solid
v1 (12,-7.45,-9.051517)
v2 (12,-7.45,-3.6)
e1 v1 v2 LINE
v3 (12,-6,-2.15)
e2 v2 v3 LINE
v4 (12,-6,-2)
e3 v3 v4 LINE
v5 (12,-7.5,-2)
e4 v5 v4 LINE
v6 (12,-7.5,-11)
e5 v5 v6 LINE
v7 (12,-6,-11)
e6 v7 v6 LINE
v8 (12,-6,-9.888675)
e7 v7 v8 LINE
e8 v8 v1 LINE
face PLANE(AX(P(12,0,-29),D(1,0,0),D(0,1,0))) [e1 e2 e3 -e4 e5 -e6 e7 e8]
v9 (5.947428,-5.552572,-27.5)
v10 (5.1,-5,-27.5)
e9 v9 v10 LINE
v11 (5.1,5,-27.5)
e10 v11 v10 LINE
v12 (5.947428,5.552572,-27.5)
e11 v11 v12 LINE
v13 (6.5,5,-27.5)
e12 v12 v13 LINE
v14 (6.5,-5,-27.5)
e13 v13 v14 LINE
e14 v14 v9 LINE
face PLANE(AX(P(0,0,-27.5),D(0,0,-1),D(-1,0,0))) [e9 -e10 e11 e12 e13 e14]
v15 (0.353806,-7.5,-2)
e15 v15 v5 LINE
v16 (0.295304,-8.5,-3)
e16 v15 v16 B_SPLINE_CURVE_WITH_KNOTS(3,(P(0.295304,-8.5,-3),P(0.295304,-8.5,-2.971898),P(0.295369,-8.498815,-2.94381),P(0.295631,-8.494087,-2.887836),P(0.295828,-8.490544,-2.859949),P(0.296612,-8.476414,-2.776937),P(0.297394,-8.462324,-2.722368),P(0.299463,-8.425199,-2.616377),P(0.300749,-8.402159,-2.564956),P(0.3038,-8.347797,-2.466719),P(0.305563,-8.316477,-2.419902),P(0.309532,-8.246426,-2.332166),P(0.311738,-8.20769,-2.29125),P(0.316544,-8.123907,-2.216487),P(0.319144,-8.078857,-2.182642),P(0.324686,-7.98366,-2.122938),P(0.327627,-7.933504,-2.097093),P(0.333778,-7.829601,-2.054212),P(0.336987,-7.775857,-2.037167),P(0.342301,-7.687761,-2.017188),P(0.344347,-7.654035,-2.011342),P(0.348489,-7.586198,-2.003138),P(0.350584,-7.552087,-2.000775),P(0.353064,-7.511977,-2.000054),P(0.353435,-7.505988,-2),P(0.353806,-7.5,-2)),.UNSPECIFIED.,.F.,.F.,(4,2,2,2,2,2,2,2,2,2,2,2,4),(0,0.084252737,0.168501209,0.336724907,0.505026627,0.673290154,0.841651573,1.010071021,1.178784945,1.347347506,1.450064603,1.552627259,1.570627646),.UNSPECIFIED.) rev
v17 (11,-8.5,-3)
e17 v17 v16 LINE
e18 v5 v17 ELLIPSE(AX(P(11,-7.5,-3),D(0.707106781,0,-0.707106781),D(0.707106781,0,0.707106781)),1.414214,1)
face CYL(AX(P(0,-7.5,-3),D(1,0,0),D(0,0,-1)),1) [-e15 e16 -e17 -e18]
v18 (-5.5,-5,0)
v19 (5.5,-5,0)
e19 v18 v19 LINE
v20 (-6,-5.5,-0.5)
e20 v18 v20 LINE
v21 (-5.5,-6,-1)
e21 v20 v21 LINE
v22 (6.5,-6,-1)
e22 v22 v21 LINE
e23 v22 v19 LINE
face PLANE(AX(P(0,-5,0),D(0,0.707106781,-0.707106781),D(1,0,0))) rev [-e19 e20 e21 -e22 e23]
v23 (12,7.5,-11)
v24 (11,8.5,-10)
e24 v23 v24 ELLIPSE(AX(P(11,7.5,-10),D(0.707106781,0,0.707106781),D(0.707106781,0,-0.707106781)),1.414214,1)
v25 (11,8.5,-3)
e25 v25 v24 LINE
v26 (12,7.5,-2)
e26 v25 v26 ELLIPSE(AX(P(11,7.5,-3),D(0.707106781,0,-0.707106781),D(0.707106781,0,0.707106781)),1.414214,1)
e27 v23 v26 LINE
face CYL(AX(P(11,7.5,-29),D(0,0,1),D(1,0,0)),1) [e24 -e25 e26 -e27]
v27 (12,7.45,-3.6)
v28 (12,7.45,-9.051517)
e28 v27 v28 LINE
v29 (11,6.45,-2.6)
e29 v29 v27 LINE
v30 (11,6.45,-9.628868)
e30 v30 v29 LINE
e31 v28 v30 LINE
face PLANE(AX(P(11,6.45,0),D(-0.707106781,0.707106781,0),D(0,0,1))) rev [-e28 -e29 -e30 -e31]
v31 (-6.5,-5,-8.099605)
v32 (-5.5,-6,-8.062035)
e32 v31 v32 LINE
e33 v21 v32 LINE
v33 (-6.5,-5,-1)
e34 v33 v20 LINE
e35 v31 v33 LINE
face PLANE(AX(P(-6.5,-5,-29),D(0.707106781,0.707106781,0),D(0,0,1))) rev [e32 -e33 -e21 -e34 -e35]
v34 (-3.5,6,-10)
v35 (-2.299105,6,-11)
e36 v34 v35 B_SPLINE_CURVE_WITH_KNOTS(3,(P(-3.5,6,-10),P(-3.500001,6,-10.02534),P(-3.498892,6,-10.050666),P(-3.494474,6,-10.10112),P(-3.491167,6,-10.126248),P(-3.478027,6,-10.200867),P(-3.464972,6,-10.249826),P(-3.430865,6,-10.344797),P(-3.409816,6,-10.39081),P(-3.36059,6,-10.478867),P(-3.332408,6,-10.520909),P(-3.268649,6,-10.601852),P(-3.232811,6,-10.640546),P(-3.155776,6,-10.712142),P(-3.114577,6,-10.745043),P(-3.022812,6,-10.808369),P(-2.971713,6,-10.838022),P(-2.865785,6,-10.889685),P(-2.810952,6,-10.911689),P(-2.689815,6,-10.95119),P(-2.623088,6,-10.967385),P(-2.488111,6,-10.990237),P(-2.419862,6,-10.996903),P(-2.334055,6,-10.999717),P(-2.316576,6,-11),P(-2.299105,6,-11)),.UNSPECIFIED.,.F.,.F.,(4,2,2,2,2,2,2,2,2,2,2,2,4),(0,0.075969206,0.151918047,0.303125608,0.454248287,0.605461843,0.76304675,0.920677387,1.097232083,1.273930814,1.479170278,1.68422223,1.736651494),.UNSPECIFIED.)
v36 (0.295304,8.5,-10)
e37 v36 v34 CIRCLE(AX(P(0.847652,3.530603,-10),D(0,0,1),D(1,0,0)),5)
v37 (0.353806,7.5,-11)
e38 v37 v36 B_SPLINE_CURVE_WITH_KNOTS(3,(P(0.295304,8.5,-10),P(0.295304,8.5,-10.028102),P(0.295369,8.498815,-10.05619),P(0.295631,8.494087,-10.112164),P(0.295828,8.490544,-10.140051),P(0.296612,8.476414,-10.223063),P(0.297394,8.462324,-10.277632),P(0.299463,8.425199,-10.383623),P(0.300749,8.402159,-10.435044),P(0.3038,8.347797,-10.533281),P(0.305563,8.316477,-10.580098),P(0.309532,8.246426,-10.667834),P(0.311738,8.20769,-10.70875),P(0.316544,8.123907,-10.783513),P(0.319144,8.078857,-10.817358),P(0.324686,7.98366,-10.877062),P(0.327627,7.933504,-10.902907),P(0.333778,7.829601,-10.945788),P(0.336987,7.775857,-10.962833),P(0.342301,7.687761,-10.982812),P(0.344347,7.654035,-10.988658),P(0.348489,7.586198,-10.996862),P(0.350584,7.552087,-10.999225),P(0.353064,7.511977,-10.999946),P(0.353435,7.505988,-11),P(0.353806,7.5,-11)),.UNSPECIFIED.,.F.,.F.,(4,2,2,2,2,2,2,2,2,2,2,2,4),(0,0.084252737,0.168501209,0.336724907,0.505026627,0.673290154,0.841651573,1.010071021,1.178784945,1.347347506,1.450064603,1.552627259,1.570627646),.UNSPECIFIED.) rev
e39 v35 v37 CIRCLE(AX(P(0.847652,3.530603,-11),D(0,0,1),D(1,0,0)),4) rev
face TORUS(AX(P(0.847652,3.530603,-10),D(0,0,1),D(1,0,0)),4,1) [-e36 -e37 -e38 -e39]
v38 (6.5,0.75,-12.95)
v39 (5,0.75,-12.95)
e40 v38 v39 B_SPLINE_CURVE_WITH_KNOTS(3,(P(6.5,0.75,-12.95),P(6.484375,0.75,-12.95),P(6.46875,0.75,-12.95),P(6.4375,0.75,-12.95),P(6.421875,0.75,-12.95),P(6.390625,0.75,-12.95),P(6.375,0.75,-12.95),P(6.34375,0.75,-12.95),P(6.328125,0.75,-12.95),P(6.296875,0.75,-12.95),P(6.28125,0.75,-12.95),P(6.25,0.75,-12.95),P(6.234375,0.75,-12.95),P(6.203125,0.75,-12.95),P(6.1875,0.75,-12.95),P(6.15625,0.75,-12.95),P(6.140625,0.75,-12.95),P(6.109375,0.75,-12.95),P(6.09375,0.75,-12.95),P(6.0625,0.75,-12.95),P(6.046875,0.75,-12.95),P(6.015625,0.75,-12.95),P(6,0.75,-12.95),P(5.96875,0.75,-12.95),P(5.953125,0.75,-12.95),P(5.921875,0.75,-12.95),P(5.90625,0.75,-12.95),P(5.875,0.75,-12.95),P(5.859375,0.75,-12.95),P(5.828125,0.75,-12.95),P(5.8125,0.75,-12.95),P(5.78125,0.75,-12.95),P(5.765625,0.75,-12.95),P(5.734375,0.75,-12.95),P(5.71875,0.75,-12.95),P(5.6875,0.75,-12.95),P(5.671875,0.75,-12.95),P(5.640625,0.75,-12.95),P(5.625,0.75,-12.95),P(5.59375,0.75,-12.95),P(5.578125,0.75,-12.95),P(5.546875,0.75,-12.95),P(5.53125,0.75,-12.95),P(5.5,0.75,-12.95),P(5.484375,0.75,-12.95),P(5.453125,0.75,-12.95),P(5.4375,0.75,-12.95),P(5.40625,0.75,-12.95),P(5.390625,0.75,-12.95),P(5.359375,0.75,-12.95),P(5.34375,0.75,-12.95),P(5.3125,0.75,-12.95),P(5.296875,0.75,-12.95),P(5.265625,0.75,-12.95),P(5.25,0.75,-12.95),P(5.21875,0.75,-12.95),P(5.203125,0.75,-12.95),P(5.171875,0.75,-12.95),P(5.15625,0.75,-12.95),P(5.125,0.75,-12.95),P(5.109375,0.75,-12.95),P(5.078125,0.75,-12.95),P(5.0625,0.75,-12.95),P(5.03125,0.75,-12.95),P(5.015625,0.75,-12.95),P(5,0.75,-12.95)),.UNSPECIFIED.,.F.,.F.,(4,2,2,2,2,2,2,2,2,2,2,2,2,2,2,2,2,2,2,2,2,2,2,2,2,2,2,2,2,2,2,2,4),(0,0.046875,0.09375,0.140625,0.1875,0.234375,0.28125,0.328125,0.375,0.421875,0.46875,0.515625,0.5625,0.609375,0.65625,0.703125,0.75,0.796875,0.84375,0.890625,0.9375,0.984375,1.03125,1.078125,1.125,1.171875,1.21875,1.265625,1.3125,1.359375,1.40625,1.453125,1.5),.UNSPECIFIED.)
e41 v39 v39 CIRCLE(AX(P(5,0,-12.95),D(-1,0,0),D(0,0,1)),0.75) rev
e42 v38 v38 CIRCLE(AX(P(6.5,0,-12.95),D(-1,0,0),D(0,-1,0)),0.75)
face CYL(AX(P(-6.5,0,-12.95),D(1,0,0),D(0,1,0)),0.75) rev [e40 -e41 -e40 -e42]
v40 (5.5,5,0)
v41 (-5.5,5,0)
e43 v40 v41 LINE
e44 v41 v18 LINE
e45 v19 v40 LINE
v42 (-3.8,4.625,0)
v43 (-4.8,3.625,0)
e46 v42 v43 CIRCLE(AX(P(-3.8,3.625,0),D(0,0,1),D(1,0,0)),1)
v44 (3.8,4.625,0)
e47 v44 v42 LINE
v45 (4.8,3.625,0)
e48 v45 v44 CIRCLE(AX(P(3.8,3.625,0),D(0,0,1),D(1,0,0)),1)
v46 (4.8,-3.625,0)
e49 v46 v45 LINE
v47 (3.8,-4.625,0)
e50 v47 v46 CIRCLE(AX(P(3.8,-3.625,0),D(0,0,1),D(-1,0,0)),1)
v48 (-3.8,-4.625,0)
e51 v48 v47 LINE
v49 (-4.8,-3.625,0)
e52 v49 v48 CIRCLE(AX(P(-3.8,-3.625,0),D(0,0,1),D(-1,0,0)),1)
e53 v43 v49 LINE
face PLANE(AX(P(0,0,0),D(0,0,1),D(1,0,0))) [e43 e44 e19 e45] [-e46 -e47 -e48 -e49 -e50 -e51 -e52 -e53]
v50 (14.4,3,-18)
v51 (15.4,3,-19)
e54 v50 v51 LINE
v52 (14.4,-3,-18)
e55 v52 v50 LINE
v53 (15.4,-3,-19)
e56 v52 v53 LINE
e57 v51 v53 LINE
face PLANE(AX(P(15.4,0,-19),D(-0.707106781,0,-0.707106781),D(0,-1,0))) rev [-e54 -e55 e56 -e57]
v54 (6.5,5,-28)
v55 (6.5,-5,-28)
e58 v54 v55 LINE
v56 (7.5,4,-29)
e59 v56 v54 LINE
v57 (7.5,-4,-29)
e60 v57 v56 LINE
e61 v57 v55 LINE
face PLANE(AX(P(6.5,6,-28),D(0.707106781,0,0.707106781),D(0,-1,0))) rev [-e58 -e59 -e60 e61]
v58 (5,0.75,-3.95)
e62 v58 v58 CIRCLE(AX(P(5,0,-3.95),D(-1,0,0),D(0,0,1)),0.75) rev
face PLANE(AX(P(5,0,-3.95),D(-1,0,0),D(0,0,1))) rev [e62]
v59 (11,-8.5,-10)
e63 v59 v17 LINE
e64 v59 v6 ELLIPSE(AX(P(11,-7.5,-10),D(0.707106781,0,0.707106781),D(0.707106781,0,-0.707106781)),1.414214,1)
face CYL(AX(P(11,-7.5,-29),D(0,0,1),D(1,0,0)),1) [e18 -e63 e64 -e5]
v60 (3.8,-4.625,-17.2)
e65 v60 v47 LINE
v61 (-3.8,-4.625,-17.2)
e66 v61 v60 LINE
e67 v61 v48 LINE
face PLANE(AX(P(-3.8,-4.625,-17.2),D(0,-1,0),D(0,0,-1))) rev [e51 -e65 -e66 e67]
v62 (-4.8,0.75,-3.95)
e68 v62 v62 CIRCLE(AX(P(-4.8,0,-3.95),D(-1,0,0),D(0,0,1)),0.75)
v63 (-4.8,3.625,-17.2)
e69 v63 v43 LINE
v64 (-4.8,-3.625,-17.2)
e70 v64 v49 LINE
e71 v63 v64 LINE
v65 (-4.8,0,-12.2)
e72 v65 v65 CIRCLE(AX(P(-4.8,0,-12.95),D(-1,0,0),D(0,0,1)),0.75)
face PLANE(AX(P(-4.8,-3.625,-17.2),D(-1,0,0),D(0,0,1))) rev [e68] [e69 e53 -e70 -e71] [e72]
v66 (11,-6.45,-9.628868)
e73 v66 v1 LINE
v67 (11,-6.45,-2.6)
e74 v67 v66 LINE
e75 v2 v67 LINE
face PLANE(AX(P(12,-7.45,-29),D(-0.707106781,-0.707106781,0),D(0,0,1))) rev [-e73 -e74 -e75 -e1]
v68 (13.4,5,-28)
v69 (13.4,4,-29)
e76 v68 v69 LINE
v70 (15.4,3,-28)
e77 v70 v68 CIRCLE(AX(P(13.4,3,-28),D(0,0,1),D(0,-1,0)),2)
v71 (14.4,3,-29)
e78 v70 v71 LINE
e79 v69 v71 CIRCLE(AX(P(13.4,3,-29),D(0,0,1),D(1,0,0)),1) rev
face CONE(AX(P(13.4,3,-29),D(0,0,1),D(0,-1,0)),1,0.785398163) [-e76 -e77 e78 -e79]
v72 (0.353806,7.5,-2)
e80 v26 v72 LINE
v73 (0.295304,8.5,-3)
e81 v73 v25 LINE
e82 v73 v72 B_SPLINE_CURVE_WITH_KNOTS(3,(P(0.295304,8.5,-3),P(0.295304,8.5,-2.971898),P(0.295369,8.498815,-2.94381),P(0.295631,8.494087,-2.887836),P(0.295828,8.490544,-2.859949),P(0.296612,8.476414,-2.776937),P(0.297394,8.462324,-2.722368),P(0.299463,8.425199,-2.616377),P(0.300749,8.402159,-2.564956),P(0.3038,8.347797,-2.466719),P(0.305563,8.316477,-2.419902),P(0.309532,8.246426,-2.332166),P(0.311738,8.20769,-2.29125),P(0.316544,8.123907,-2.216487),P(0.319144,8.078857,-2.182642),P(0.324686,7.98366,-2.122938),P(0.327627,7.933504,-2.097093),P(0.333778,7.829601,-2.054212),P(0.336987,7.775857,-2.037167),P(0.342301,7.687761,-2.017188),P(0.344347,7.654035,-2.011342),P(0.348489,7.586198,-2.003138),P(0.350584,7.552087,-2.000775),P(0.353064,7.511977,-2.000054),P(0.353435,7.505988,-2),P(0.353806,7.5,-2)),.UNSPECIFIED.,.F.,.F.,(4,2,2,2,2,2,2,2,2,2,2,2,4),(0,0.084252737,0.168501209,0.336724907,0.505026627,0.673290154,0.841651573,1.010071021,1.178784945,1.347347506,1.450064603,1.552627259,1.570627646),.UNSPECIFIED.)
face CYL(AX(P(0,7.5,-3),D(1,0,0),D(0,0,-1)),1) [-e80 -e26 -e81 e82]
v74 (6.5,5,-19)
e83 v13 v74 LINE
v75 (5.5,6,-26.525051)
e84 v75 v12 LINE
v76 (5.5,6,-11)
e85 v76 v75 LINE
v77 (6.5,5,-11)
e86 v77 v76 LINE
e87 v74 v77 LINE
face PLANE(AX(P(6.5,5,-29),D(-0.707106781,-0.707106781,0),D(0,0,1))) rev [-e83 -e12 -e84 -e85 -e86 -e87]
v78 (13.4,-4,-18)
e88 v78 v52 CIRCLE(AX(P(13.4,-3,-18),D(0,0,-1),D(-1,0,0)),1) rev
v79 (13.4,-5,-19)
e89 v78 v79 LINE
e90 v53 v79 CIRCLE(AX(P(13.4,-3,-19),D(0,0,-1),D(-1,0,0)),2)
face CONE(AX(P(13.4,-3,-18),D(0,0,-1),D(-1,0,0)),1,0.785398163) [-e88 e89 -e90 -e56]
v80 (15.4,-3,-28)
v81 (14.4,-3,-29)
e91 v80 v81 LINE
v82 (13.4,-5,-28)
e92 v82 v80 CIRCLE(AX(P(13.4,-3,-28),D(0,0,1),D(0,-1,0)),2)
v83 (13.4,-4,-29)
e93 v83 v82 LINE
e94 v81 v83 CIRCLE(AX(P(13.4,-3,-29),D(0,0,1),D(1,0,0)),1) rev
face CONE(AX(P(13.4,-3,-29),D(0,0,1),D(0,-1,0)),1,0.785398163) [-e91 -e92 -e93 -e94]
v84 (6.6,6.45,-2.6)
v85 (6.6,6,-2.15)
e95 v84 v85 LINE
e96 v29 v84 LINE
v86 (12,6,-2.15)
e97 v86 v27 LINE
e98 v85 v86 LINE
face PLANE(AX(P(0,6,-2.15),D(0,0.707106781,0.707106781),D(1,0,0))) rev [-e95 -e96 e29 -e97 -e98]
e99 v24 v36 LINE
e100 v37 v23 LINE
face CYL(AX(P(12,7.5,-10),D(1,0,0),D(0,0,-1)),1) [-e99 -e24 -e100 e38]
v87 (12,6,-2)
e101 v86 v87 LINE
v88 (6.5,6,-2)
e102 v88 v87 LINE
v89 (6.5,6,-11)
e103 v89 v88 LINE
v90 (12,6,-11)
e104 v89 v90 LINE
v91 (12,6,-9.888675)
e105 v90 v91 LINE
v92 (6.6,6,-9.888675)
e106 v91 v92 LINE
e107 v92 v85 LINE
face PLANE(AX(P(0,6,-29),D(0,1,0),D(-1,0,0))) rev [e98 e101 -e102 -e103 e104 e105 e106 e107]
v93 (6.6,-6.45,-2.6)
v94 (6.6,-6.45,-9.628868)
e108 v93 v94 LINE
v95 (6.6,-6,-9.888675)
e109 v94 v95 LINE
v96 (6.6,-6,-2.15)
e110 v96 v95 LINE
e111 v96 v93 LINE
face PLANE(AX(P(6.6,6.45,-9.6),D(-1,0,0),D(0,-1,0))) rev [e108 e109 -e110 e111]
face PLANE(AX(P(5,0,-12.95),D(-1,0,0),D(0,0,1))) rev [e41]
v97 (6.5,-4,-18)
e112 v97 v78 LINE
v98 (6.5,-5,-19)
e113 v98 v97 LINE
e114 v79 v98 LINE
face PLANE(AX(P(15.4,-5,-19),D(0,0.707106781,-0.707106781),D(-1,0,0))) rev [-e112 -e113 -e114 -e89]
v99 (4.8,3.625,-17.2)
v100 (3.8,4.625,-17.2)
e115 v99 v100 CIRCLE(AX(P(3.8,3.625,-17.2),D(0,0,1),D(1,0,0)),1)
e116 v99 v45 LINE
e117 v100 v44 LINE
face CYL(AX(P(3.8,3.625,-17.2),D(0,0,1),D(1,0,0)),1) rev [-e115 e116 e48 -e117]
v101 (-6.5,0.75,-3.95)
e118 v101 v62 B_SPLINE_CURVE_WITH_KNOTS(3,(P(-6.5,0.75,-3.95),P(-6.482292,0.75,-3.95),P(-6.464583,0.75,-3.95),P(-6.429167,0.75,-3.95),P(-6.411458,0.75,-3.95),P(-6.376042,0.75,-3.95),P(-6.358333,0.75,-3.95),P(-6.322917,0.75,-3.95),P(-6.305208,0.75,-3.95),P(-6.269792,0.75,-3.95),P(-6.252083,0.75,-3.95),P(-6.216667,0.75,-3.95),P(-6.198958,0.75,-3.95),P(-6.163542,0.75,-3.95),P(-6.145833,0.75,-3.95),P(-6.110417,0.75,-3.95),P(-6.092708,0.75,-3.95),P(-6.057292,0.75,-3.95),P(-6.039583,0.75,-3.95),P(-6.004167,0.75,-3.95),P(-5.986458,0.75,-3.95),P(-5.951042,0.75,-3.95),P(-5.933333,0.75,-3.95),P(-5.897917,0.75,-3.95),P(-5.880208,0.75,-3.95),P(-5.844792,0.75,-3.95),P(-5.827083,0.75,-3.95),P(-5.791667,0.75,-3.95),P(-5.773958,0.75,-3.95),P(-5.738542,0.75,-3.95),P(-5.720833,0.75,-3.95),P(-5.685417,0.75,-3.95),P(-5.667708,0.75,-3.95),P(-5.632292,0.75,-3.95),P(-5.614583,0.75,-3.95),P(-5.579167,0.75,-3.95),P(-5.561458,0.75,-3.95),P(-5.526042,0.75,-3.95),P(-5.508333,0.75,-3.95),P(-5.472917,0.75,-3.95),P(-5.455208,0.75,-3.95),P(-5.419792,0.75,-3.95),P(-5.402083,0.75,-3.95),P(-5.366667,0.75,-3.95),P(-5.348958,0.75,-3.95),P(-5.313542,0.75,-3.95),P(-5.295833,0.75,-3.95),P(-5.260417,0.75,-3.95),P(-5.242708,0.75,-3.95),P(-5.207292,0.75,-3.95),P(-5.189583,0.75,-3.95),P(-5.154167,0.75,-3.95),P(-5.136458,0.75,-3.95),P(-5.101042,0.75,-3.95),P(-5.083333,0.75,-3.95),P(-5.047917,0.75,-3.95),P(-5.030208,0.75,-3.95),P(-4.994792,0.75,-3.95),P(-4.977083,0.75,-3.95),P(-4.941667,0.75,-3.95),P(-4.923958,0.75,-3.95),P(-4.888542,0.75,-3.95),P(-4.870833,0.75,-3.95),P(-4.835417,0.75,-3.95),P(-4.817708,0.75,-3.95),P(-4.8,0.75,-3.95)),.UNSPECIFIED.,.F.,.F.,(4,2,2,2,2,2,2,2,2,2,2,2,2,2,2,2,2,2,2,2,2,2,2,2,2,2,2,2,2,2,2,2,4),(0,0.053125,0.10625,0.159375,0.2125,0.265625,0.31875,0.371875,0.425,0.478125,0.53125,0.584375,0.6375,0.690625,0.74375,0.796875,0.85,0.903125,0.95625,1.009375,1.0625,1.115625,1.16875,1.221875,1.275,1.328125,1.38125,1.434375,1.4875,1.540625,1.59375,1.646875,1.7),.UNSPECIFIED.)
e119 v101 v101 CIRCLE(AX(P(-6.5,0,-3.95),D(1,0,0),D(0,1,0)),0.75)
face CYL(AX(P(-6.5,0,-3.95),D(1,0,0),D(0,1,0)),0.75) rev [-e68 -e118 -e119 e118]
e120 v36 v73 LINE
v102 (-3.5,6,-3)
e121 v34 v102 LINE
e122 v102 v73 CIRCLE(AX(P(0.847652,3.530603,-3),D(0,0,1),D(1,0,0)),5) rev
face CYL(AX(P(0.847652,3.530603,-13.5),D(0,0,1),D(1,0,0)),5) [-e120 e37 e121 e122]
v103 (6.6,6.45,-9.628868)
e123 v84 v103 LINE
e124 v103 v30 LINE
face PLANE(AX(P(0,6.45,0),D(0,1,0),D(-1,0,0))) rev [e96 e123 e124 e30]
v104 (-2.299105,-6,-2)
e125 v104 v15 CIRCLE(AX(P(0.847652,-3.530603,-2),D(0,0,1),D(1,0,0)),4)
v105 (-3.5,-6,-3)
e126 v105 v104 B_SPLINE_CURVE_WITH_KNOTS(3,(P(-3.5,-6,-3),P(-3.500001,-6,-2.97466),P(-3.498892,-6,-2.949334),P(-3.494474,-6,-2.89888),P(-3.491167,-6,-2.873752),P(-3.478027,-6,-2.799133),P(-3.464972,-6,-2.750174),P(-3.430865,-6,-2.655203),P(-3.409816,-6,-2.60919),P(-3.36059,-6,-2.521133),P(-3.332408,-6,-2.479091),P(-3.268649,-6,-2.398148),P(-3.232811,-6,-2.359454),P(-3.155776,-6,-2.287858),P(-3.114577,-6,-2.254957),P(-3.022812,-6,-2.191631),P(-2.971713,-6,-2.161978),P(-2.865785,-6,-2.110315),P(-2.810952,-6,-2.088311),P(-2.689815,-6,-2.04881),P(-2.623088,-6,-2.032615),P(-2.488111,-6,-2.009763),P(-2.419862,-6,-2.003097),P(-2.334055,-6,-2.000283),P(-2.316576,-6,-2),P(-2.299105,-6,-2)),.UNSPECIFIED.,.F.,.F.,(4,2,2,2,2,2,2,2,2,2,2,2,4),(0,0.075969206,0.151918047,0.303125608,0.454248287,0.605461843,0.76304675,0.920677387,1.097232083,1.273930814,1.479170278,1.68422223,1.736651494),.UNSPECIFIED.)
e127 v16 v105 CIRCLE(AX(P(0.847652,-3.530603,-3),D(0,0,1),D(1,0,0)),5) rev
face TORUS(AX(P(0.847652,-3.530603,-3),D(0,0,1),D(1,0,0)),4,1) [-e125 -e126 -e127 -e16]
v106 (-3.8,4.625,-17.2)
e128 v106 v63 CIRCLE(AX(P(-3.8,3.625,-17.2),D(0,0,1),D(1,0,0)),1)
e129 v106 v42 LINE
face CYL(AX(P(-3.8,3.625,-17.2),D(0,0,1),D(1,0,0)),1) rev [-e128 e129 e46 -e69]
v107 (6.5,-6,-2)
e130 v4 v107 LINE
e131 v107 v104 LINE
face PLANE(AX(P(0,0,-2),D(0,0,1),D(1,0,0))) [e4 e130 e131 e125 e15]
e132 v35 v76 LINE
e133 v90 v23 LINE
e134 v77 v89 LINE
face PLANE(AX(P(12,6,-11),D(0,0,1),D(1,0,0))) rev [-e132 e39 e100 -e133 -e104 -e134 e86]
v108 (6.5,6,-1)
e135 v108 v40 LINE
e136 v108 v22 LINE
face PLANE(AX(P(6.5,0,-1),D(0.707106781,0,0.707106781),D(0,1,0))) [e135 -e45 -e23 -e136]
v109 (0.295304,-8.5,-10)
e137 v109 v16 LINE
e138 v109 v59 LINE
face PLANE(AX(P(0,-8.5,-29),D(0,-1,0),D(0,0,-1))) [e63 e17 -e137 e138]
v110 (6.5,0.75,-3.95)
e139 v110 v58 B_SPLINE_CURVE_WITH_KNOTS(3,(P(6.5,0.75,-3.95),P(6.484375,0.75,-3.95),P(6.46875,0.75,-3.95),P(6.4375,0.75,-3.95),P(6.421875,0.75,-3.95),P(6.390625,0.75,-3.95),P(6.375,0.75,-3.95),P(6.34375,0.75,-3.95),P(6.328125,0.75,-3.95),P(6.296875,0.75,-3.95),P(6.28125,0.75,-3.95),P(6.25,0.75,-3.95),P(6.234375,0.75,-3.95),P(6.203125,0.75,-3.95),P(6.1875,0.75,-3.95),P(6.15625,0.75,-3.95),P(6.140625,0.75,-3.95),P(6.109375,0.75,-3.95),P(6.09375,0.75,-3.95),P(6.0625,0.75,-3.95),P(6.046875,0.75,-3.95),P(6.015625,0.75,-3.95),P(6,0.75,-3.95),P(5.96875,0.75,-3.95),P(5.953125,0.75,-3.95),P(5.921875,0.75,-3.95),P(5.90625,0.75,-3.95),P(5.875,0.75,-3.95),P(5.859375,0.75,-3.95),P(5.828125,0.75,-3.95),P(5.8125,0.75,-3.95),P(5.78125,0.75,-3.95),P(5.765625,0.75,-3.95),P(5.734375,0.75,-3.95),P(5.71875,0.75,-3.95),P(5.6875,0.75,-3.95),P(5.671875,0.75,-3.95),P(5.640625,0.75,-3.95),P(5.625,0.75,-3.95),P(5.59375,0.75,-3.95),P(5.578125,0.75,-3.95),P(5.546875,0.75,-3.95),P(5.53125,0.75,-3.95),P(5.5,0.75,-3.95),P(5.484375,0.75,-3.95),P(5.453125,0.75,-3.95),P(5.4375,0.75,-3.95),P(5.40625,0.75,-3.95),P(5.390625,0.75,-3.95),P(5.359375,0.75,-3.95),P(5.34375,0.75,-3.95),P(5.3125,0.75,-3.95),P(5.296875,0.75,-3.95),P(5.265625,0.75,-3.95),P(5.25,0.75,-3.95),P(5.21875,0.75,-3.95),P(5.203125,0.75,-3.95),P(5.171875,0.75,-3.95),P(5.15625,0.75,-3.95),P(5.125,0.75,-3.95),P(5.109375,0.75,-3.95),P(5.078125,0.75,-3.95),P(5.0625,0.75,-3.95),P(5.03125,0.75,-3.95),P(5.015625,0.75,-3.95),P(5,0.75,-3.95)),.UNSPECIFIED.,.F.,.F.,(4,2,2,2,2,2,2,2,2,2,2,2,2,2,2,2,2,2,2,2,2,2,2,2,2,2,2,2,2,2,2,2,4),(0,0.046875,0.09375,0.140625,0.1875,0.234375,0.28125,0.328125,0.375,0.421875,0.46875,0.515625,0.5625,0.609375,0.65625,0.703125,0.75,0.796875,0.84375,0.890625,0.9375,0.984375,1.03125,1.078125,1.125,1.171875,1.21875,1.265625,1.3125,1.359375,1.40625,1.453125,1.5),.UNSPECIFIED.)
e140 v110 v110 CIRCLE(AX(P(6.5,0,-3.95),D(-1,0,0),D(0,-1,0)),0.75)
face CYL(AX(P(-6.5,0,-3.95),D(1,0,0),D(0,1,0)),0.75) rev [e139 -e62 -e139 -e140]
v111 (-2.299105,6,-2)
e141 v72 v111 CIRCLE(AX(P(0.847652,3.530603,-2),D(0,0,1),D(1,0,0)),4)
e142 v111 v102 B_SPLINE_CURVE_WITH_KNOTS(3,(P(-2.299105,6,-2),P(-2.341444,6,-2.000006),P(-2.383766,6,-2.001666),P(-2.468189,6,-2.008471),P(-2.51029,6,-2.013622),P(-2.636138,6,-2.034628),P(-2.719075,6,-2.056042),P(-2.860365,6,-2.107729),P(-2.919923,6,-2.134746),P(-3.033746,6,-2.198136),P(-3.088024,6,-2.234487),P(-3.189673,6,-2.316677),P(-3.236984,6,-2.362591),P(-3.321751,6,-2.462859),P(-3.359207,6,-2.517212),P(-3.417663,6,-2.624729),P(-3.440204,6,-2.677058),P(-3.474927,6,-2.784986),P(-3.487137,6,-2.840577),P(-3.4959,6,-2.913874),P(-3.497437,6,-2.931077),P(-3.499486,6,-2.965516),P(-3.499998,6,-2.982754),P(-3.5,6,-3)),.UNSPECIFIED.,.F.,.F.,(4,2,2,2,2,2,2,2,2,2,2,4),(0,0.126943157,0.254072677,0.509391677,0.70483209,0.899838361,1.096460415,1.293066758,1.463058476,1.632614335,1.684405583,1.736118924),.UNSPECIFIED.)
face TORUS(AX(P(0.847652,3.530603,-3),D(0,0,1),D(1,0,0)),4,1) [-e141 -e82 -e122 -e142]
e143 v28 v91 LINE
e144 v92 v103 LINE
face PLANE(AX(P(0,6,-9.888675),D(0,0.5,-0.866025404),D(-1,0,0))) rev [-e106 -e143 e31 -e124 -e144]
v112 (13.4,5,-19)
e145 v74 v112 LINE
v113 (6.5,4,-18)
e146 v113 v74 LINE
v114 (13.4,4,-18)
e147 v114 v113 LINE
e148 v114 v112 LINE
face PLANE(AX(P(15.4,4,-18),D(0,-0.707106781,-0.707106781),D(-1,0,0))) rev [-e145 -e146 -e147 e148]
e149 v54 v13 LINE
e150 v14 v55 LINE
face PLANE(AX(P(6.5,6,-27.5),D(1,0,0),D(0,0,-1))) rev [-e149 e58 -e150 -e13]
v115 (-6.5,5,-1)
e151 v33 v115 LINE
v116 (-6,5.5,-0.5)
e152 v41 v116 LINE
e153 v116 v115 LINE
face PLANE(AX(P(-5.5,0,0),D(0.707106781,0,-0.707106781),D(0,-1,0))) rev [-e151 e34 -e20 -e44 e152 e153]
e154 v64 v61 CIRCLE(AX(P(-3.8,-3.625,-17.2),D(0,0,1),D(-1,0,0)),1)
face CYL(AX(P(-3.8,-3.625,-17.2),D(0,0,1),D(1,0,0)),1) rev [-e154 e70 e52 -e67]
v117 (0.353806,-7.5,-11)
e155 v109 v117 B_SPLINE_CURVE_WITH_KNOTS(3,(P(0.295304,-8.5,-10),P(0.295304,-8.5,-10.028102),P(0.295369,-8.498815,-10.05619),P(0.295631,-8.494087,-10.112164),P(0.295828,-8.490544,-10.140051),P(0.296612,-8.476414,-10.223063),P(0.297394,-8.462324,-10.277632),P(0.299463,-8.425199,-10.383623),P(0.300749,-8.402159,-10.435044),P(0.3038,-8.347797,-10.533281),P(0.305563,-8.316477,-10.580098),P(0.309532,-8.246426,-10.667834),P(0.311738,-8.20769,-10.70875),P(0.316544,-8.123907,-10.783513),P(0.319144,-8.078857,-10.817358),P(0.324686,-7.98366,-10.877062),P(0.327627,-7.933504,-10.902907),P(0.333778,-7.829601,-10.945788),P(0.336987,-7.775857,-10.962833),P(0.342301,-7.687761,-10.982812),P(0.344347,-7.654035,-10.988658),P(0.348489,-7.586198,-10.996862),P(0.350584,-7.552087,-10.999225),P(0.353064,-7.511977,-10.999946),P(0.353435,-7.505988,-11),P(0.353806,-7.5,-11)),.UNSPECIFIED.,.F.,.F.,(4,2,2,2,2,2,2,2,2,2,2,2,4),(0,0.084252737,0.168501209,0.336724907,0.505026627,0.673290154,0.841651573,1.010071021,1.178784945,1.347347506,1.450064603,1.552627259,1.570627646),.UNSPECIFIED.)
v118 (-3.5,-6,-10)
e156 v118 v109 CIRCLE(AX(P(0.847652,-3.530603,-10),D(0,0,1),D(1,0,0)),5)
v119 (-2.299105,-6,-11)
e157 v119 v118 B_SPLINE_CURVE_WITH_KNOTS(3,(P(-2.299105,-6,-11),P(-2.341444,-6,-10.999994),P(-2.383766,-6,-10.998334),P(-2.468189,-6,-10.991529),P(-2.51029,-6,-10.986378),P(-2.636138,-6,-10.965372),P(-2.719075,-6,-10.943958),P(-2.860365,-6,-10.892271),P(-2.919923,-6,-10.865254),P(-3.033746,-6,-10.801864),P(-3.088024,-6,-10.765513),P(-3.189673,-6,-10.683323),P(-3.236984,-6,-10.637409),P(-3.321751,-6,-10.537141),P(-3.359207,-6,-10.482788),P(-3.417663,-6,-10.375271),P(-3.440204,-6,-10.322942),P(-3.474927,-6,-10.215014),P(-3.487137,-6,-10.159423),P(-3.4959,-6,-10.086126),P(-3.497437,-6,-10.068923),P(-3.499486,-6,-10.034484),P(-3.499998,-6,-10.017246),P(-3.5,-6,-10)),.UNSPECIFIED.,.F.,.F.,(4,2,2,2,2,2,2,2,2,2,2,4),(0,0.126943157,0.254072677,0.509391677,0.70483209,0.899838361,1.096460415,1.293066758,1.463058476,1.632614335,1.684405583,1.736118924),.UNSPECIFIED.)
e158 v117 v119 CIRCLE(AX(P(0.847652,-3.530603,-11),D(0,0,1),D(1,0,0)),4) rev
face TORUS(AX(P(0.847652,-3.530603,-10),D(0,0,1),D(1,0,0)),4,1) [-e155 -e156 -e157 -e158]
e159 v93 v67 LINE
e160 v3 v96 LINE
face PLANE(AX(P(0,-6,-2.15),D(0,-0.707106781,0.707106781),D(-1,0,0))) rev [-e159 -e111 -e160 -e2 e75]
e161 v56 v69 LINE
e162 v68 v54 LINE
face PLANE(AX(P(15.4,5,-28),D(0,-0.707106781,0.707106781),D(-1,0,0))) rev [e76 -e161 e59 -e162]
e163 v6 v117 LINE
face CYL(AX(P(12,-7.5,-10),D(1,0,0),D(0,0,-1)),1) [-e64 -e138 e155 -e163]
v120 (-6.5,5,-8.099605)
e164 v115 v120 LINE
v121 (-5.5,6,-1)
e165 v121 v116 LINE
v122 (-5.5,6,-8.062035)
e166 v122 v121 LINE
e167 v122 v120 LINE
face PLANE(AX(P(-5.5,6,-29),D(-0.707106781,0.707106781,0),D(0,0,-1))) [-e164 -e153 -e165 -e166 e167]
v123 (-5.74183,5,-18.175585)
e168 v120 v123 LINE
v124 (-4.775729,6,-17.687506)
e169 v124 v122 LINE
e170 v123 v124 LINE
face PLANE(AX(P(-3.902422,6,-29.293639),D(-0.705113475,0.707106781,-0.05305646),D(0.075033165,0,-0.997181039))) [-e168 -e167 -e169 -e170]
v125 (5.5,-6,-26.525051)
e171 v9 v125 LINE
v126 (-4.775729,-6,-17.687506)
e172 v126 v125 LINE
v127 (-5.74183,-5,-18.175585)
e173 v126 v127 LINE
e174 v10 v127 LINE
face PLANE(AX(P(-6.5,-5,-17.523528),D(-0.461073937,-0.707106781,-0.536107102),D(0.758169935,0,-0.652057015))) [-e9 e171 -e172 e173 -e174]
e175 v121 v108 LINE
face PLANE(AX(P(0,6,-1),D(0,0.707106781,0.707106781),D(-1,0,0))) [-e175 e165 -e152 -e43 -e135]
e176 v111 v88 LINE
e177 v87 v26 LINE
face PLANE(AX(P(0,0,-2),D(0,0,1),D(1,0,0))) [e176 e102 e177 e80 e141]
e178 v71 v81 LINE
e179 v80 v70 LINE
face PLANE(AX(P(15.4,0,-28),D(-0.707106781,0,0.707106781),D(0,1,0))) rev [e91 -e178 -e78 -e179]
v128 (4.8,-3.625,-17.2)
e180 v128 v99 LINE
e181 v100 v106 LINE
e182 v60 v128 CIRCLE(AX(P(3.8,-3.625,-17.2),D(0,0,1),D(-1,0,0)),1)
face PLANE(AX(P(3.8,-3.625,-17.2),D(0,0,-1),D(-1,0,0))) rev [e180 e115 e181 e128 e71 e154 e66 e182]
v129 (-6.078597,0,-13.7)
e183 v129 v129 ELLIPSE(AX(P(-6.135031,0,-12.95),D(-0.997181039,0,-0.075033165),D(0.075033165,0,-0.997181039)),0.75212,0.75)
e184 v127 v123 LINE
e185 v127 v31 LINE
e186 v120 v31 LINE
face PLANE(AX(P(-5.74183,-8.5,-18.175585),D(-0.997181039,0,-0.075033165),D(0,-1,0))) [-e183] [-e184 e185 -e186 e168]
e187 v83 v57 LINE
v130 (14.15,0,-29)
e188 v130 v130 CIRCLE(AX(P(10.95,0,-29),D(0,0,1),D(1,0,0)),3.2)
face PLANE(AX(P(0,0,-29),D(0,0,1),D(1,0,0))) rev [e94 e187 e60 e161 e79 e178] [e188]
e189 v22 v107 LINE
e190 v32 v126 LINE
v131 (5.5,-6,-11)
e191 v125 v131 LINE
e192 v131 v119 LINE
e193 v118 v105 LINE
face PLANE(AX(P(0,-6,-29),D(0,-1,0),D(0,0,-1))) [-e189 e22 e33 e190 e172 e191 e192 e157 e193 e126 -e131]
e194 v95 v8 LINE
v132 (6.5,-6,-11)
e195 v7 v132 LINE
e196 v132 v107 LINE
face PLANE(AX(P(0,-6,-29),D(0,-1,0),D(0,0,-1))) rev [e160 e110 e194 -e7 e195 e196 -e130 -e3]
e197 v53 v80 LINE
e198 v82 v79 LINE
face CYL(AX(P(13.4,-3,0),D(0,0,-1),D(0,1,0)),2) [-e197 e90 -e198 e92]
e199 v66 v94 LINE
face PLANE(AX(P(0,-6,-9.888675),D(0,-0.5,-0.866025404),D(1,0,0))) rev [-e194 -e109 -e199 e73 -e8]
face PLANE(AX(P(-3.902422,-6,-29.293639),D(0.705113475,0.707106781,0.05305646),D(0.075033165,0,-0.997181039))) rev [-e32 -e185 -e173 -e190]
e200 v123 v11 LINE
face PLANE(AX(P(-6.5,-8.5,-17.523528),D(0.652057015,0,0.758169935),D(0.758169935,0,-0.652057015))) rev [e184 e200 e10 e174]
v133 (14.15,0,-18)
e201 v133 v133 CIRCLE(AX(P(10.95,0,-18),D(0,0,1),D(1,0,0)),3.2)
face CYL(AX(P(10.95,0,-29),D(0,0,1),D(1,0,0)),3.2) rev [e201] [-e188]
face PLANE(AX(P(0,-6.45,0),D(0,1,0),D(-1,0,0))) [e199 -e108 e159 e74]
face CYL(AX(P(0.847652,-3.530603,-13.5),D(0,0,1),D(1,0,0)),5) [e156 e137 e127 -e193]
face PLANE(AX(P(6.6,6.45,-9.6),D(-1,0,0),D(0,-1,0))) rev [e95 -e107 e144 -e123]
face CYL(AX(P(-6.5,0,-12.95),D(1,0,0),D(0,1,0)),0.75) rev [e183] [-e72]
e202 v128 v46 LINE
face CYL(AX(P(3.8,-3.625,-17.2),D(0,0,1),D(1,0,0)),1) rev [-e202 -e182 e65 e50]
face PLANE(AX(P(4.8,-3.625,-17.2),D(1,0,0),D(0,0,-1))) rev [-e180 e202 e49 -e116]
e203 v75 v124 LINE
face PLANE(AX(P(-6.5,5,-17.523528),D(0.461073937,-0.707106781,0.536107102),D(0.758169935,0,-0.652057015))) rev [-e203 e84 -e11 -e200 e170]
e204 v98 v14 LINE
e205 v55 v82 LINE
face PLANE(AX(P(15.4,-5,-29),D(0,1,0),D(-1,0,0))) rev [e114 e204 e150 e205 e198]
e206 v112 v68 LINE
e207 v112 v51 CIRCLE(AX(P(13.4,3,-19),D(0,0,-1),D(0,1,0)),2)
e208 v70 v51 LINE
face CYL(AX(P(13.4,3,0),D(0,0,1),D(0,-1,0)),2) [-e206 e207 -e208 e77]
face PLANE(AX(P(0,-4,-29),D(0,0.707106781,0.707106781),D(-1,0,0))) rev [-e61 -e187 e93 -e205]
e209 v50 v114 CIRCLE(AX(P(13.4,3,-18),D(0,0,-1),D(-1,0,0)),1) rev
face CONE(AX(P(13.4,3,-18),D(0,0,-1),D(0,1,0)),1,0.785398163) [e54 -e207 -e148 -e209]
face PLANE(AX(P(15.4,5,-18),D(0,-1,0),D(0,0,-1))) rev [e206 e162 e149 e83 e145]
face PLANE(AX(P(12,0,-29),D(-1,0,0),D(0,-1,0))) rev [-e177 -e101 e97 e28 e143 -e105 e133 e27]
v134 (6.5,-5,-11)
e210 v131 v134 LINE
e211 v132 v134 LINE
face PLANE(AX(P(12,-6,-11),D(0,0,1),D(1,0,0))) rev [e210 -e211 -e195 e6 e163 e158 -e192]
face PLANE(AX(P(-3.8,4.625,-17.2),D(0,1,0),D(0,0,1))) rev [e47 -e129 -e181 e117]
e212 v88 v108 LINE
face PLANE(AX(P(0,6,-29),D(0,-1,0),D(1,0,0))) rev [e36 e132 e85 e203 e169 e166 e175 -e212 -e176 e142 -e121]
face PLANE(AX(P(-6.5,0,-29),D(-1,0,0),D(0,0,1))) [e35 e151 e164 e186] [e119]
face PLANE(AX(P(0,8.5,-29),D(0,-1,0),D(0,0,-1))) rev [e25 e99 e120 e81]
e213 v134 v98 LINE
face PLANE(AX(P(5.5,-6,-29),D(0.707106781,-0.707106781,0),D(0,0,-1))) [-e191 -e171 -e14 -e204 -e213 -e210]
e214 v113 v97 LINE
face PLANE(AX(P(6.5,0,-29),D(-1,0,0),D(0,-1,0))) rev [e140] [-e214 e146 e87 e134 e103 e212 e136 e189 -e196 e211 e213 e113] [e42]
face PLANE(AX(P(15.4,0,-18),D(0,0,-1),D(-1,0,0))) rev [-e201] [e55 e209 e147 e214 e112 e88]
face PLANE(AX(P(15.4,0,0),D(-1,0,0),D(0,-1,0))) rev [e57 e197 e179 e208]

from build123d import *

# Parameters (mm, degrees)
SKETCH2_W                = 13
SKETCH2_H                = 12
BOSS_EXTRUDE3_DEPTH      = 29
CUT_EXTRUDE2_DEPTH       = 17.2
SKETCH5_W                = 15.5
SKETCH5_H                = 2.5
CUT_EXTRUDE3_DEPTH       = 2
CHAMFER4_SIZE            = 1
SKETCH6_W                = 15.5
SKETCH6_H                = 18
CUT_EXTRUDE4_DEPTH       = 2.5
SKETCH8_W                = 15.5
SKETCH8_H                = 18
CUT_EXTRUDE5_DEPTH       = 2.5
BOSS_EXTRUDE4_DEPTH      = 8.9
SKETCH10_R               = 3.2
CUT_EXTRUDE6_DEPTH       = 11
SKETCH11_W               = 13
SKETCH11_H               = 12
CUT_EXTRUDE7_DEPTH       = 1.5
FILLET1_R                = 2
CHAMFER5_SIZE            = 1
CUT_EXTRUDE9_DEPTH       = 36.894428537
CHAMFER6_SIZE            = 1
CHAMFER6_SIZE_2          = 9.42392311
CUT_EXTRUDE11_DEPTH      = 11.5
CHAMFER7_SIZE            = 1
FILLET2_R                = 1
CUT_EXTRUDE12_DEPTH      = 33.897568325
CUT_EXTRUDE12_DEPTH_BACK = 33.897568325
SKETCH17_R               = 0.75
BOSS_EXTRUDE5_START      = -0.2
SKETCH18_R               = 0.795097265
SKETCH18_R_2             = 0.75
BOSS_EXTRUDE5_DEPTH      = 0.2
SKETCH19_W               = 5.4
SKETCH19_H               = 6.7
CUT_EXTRUDE13_DEPTH      = 6.45
CHAMFER8_SIZE            = 0.75
CHAMFER9_SIZE            = 0.288675135
CHAMFER9_SIZE_2          = 0.5
CHAMFER10_SIZE           = 1


with BuildPart() as part:
    # Sketch2 → Boss-Extrude3 (new body)
    with BuildSketch(Plane.XY):
        Polygon((-3.5, 8.5), (-3.5, 6), (6.5, 6), (12, 6), (12, 8.5), align=None)
        Rectangle(SKETCH2_W, SKETCH2_H)
        Polygon((12, -6), (6.5, -6), (-3.5, -6), (-3.5, -8.5), (12, -8.5), align=None)
    extrude(amount=-BOSS_EXTRUDE3_DEPTH)

    # Sketch4 → Cut-Extrude2 (cut)
    with BuildSketch(Plane.XY):
        with BuildLine():
            Line((-3.8, -4.625), (3.8, -4.625))
            ThreePointArc((3.8, -4.625), (4.507106781, -4.332106781), (4.8, -3.625))
            Line((4.8, -3.625), (4.8, 3.625))
            ThreePointArc((4.8, 3.625), (4.507106781, 4.332106781), (3.8, 4.625))
            Line((3.8, 4.625), (-3.8, 4.625))
            ThreePointArc((-3.8, 4.625), (-4.507106781, 4.332106781), (-4.8, 3.625))
            Line((-4.8, 3.625), (-4.8, -3.625))
            ThreePointArc((-4.8, -3.625), (-4.507106781, -4.332106781), (-3.8, -4.625))
        make_face()
    extrude(amount=-CUT_EXTRUDE2_DEPTH, mode=Mode.SUBTRACT)

    # Sketch5 → Cut-Extrude3 (cut)
    with BuildSketch(Plane.XY):
        with Locations((4.25, 7.25)):
            Rectangle(SKETCH5_W, SKETCH5_H)
        with Locations((4.25, -7.25)):
            Rectangle(SKETCH5_W, SKETCH5_H)
    extrude(amount=-CUT_EXTRUDE3_DEPTH, mode=Mode.SUBTRACT)

    # Chamfer4
    chamfer4_edges = [part.edges().sort_by_distance(p)[0] for p in [
        (6.5, 0, 0),
        (0, -6, 0),
        (-6.5, 0, 0),
        (0, 6, 0),
    ]]
    chamfer(chamfer4_edges, length=CHAMFER4_SIZE)

    # Sketch6 → Cut-Extrude4 (cut)
    with BuildSketch(Plane(origin=(0, 8.5, 0), x_dir=(1, 0, 0), z_dir=(0, 1, 0))):
        with Locations((4.25, 20)):
            Rectangle(SKETCH6_W, SKETCH6_H)
    extrude(amount=-CUT_EXTRUDE4_DEPTH, mode=Mode.SUBTRACT)

    # Sketch8 → Cut-Extrude5 (cut)
    with BuildSketch(Plane.XZ.offset(8.5)):
        with Locations((4.25, -20)):
            Rectangle(SKETCH8_W, SKETCH8_H)
    extrude(amount=-CUT_EXTRUDE5_DEPTH, mode=Mode.SUBTRACT)

    # Sketch9 → Boss-Extrude4 (add)
    with BuildSketch(Plane(origin=(6.5, 0, 0), x_dir=(0, 0, -1), z_dir=(1, 0, 0))):
        Polygon((18, 0), (18, 5), (29, 5), (29, -5), (18, -5), align=None)
    extrude(amount=BOSS_EXTRUDE4_DEPTH)

    # Sketch10 → Cut-Extrude6 (cut)
    with BuildSketch(Plane.XY.offset(-18)):
        with Locations((10.95, 0)):
            Circle(SKETCH10_R)
    extrude(amount=-CUT_EXTRUDE6_DEPTH, mode=Mode.SUBTRACT)

    # Sketch11 → Cut-Extrude7 (cut)
    with BuildSketch(Plane(origin=(0, 0, -29), x_dir=(-1, 0, 0), z_dir=(0, 0, -1))):
        Rectangle(SKETCH11_W, SKETCH11_H)
    extrude(amount=-CUT_EXTRUDE7_DEPTH, mode=Mode.SUBTRACT)

    # Fillet1
    fillet1_edges = [part.edges().sort_by_distance(p)[0] for p in [
        (15.4, -5, -23.5),
        (15.4, 5, -23.5),
    ]]
    fillet(fillet1_edges, radius=FILLET1_R)

    # Chamfer5
    chamfer5_edges = [part.edges().sort_by_distance(p)[0] for p in [
        (6.5, 0, -29),
        (15.4, 0, -18),
        (15.4, 0, -29),
        (9.95, -5, -18),
        (9.95, 5, -18),
        (14.814213562, -4.414213562, -18),
        (14.814213562, 4.414213562, -18),
        (9.95, 5, -29),
        (9.95, -5, -29),
        (14.814213562, -4.414213562, -29),
        (14.814213562, 4.414213562, -29),
    ]]
    chamfer(chamfer5_edges, length=CHAMFER5_SIZE)

    # Sketch14 → Cut-Extrude9 (cut, through all)
    with BuildSketch(Plane(origin=(0, 6, 0), x_dir=(1, 0, 0), z_dir=(0, 1, 0))):
        Polygon((-6.5, 27.5), (-6.5, 17.523527678), (5.1, 27.5), align=None)
    extrude(amount=-CUT_EXTRUDE9_DEPTH, mode=Mode.SUBTRACT)

    # Chamfer6
    # the kernel refuses this chamfer: 9.42392311, 1 mm, written as the material it takes off along each edge
    with BuildSketch(Plane(origin=(-6.5, 30.49964556, -17.523527678), x_dir=(0.6076323251889422, 0, -0.794218456966016), z_dir=(0, -1, 0))) as chamfer6_piece_1:
        Polygon((CHAMFER6_SIZE * 0.978564276214, CHAMFER6_SIZE * 0.205941635709), (-CHAMFER6_SIZE_2 * 0.794218456941, CHAMFER6_SIZE_2 * 0.60763232517), (0, 0), align=None)
    extrude(amount=60.999291121, mode=Mode.SUBTRACT)
    # the kernel refuses this chamfer: 9.42392311, 1 mm, written as the material it takes off along each edge
    with BuildSketch(Plane(origin=(-7.691602788, -6, -16.498700761), x_dir=(0.6518104828071479, -0.027495876610586452, 0.757883283409872), z_dir=(0.7581699346405228, 0, -0.6520570145372148))) as chamfer6_2_piece_1:
        Polygon((CHAMFER6_SIZE * 0.999621916911, -CHAMFER6_SIZE * 0.0274958766106), (-CHAMFER6_SIZE * 0.0274958766106, -CHAMFER6_SIZE * 0.999621916911), (0, 0), align=None)
    extrude(amount=19.443365976, mode=Mode.SUBTRACT)
    with BuildSketch(Plane(origin=(-7.691602788, 6, -16.498700761), x_dir=(0.6518104828071478, 0.02749587661058648, 0.757883283409872), z_dir=(0.7581699346405228, 0, -0.6520570145372148))) as chamfer6_2_piece_2:
        Polygon((CHAMFER6_SIZE * 0.999621916911, CHAMFER6_SIZE * 0.0274958766106), (-CHAMFER6_SIZE * 0.0274958766106, CHAMFER6_SIZE * 0.999621916911), (0, 0), align=None)
    extrude(amount=19.443365976, mode=Mode.SUBTRACT)

    # Sketch16 → Cut-Extrude11 (cut)
    with BuildSketch(Plane.XY.offset(-2)):
        with BuildLine():
            ThreePointArc((-3.5, 6), (-1.902802726, 7.706126426), (0.295303565, 8.5))
            Line((0.295303565, 8.5), (-3.5, 8.5))
            Line((-3.5, 8.5), (-3.5, 6))
        make_face()
        with BuildLine():
            Line((-3.5, -8.5), (0.295303565, -8.5))
            ThreePointArc((0.295303565, -8.5), (-1.902802726, -7.706126426), (-3.5, -6))
            Line((-3.5, -6), (-3.5, -8.5))
        make_face()
    extrude(amount=-CUT_EXTRUDE11_DEPTH, mode=Mode.SUBTRACT)

    # Chamfer7
    # the kernel refuses this chamfer: 1 mm, written as the material it takes off along each edge
    with BuildSketch(Plane(origin=(6.5, -6, -11), x_dir=(0.027495876610586487, 0.9996219169112968, 0), z_dir=(0, 0, -1))) as chamfer7_piece_1:
        Polygon((CHAMFER7_SIZE * 0.999621916911, -CHAMFER7_SIZE * 0.0274958766106), (-CHAMFER7_SIZE * 0.0274958766106, -CHAMFER7_SIZE * 0.999621916911), (0, 0), align=None)
    extrude(amount=18.956774475, mode=Mode.SUBTRACT)
    with BuildSketch(Plane(origin=(-6.5, -6, 1.571682988), x_dir=(0.9996219169112968, -0.027495876610586487, 0), z_dir=(0, 0, -1))) as chamfer7_piece_2:
        Polygon((CHAMFER7_SIZE * 0.999621916911, -CHAMFER7_SIZE * 0.0274958766106), (-CHAMFER7_SIZE * 0.0274958766106, -CHAMFER7_SIZE * 0.999621916911), (0, 0), align=None)
    extrude(amount=12.242970544, mode=Mode.SUBTRACT)
    with BuildSketch(Plane(origin=(-5.654981471, -6, -19.329791256), x_dir=(0.9968040214884636, -0.02749587661058647, 0.07500479660556608), z_dir=(-0.0750331653764868, 0, 0.9971810387756)), Plane(origin=(-6.692961515, 6, -5.535171055), x_dir=(0.9968040214884636, 0.027495876610586487, 0.07500479660556608), z_dir=(0.0750331653764868, 0, -0.9971810387756))) as chamfer7_piece_3:
        Polygon((CHAMFER7_SIZE * 0.999621916911, CHAMFER7_SIZE * 0.0274958766106), (-CHAMFER7_SIZE * 0.0274958766106, CHAMFER7_SIZE * 0.999621916911), (0, 0), align=None)
    extrude(amount=13.833616631, mode=Mode.SUBTRACT)
    with BuildSketch(Plane(origin=(6.5, 6, -11), x_dir=(0.027495876610586487, -0.9996219169112968, 0), z_dir=(0, 0, -1))) as chamfer7_piece_4:
        Polygon((CHAMFER7_SIZE * 0.999621916911, CHAMFER7_SIZE * 0.0274958766106), (-CHAMFER7_SIZE * 0.0274958766106, CHAMFER7_SIZE * 0.999621916911), (0, 0), align=None)
    extrude(amount=18.956774475, mode=Mode.SUBTRACT)
    with BuildSketch(Plane(origin=(-6.5, 6, 1.571682988), x_dir=(0.9996219169112968, 0.027495876610586487, 0), z_dir=(0, 0, -1))) as chamfer7_piece_5:
        Polygon((CHAMFER7_SIZE * 0.999621916911, CHAMFER7_SIZE * 0.0274958766106), (-CHAMFER7_SIZE * 0.0274958766106, CHAMFER7_SIZE * 0.999621916911), (0, 0), align=None)
    extrude(amount=12.242970544, mode=Mode.SUBTRACT)

    # Fillet2
    # the kernel refuses this fillet: 1 mm, written as the material it takes off along each edge
    with BuildSketch(Plane(origin=(12, 8.5, -1), x_dir=(-1, 0, 0), z_dir=(0, 0, -1))) as fillet2_piece_1:
        with BuildLine():
            CenterArc((FILLET2_R, -FILLET2_R), FILLET2_R, 90, 90)
            Line((0, -FILLET2_R), (-FILLET2_R * 0.02, -FILLET2_R))
            Line((-FILLET2_R * 0.02, -FILLET2_R), (-FILLET2_R * 0.02, FILLET2_R * 0.02))
            Line((-FILLET2_R * 0.02, FILLET2_R * 0.02), (FILLET2_R, FILLET2_R * 0.02))
            Line((FILLET2_R, FILLET2_R * 0.02), (FILLET2_R, 0))
        make_face()
    extrude(amount=11, mode=Mode.SUBTRACT)
    with BuildSketch(Plane(origin=(12, -8.5, -1), x_dir=(-1, 0, 0), z_dir=(0, 0, -1))) as fillet2_piece_2:
        with BuildLine():
            CenterArc((FILLET2_R, FILLET2_R), FILLET2_R, 180, 90)
            Line((0, FILLET2_R), (-FILLET2_R * 0.02, FILLET2_R))
            Line((-FILLET2_R * 0.02, FILLET2_R), (-FILLET2_R * 0.02, -FILLET2_R * 0.02))
            Line((-FILLET2_R * 0.02, -FILLET2_R * 0.02), (FILLET2_R, -FILLET2_R * 0.02))
            Line((FILLET2_R, -FILLET2_R * 0.02), (FILLET2_R, 0))
        make_face()
    extrude(amount=11, mode=Mode.SUBTRACT)
    with BuildSketch(Plane(origin=(13, -8.5, -11), x_dir=(0, 1, 0), z_dir=(-1, 0, 0))) as fillet2_piece_3:
        with BuildLine():
            CenterArc((FILLET2_R, -FILLET2_R), FILLET2_R, 90, 90)
            Line((0, -FILLET2_R), (-FILLET2_R * 0.02, -FILLET2_R))
            Line((-FILLET2_R * 0.02, -FILLET2_R), (-FILLET2_R * 0.02, FILLET2_R * 0.02))
            Line((-FILLET2_R * 0.02, FILLET2_R * 0.02), (FILLET2_R, FILLET2_R * 0.02))
            Line((FILLET2_R, FILLET2_R * 0.02), (FILLET2_R, 0))
        make_face()
    extrude(amount=13.704696435, mode=Mode.SUBTRACT)
    with BuildSketch(Plane(origin=(0.847651782, -3.530602507, -11), x_dir=(-0.9503253721625865, -0.31125823205827297, 0), z_dir=(-0.31125823205827297, 0.9503253721625865, 0))) as fillet2_piece_4_section:
        with BuildLine():
            CenterArc((5 - FILLET2_R, FILLET2_R), FILLET2_R, 270, 90)
            Line((5, FILLET2_R), (5 + FILLET2_R * 0.02, FILLET2_R))
            Line((5 + FILLET2_R * 0.02, FILLET2_R), (5 + FILLET2_R * 0.02, -FILLET2_R * 0.02))
            Line((5 + FILLET2_R * 0.02, -FILLET2_R * 0.02), (5 - FILLET2_R, -FILLET2_R * 0.02))
            Line((5 - FILLET2_R, -FILLET2_R * 0.02), (5 - FILLET2_R, 0))
        make_face()
    fillet2_piece_4 = revolve(axis=Axis((0.847651782, -3.530602507, -11), (0, 0, 1)), revolution_arc=76.983353639, mode=Mode.PRIVATE)
    fillet2_piece_4 = split(fillet2_piece_4, bisect_by=Plane(origin=(-1.33988421, -6, -10.714938554), z_dir=(0, -1, 0)), keep=Keep.TOP, mode=Mode.PRIVATE)
    add(fillet2_piece_4, mode=Mode.SUBTRACT)
    with BuildSketch(Plane(origin=(13, 8.5, -11), x_dir=(0, -1, 0), z_dir=(-1, 0, 0)), Plane(origin=(-0.704696435, -8.5, -2), x_dir=(0, 0, -1), z_dir=(1, 0, 0)), Plane(origin=(13, 8.5, -2), x_dir=(0, 0, -1), z_dir=(-1, 0, 0))) as fillet2_piece_5:
        with BuildLine():
            CenterArc((FILLET2_R, FILLET2_R), FILLET2_R, 180, 90)
            Line((0, FILLET2_R), (-FILLET2_R * 0.02, FILLET2_R))
            Line((-FILLET2_R * 0.02, FILLET2_R), (-FILLET2_R * 0.02, -FILLET2_R * 0.02))
            Line((-FILLET2_R * 0.02, -FILLET2_R * 0.02), (FILLET2_R, -FILLET2_R * 0.02))
            Line((FILLET2_R, -FILLET2_R * 0.02), (FILLET2_R, 0))
        make_face()
    extrude(amount=13.704696435, mode=Mode.SUBTRACT)
    with BuildSketch(Plane(origin=(0.847651782, 3.530602507, -11), x_dir=(0.08921463778301607, 0.9960124238207299, 0), z_dir=(0.9960124238207299, -0.08921463778301607, 0))) as fillet2_piece_6_section:
        with BuildLine():
            CenterArc((5 - FILLET2_R, FILLET2_R), FILLET2_R, 270, 90)
            Line((5, FILLET2_R), (5 + FILLET2_R * 0.02, FILLET2_R))
            Line((5 + FILLET2_R * 0.02, FILLET2_R), (5 + FILLET2_R * 0.02, -FILLET2_R * 0.02))
            Line((5 + FILLET2_R * 0.02, -FILLET2_R * 0.02), (5 - FILLET2_R, -FILLET2_R * 0.02))
            Line((5 - FILLET2_R, -FILLET2_R * 0.02), (5 - FILLET2_R, 0))
        make_face()
    fillet2_piece_6 = revolve(axis=Axis((0.847651782, 3.530602507, -11), (0, 0, 1)), revolution_arc=76.983353639, mode=Mode.PRIVATE)
    fillet2_piece_6 = split(fillet2_piece_6, bisect_by=Plane(origin=(-1.339884211, 6, -10.714938555), z_dir=(0, 1, 0)), keep=Keep.TOP, mode=Mode.PRIVATE)
    add(fillet2_piece_6, mode=Mode.SUBTRACT)
    with BuildSketch(Plane(origin=(0.847651782, -3.530602507, -2), x_dir=(0.08921463778301987, -0.9960124238207294, 0), z_dir=(0.9960124238207294, 0.08921463778301987, 0))) as fillet2_piece_7_section:
        with BuildLine():
            CenterArc((5 - FILLET2_R, FILLET2_R), FILLET2_R, 270, 90)
            Line((5 - FILLET2_R, 0), (5 - FILLET2_R, -FILLET2_R * 0.02))
            Line((5 - FILLET2_R, -FILLET2_R * 0.02), (5 + FILLET2_R * 0.02, -FILLET2_R * 0.02))
            Line((5 + FILLET2_R * 0.02, -FILLET2_R * 0.02), (5 + FILLET2_R * 0.02, FILLET2_R))
            Line((5 + FILLET2_R * 0.02, FILLET2_R), (5, FILLET2_R))
        make_face()
    fillet2_piece_7 = revolve(axis=Axis((0.847651782, -3.530602507, -2), (0, 0, -1)), revolution_arc=76.983353639, mode=Mode.PRIVATE)
    fillet2_piece_7 = split(fillet2_piece_7, bisect_by=Plane(origin=(-1.33988421, -6, -2.285061446), z_dir=(0, -1, 0)), keep=Keep.TOP, mode=Mode.PRIVATE)
    add(fillet2_piece_7, mode=Mode.SUBTRACT)
    with BuildSketch(Plane(origin=(0.847651782, 3.530602507, -2), x_dir=(-0.9503253721625862, 0.31125823205827374, 0), z_dir=(-0.31125823205827374, -0.9503253721625862, 0))) as fillet2_piece_8_section:
        with BuildLine():
            CenterArc((5 - FILLET2_R, FILLET2_R), FILLET2_R, 270, 90)
            Line((5 - FILLET2_R, 0), (5 - FILLET2_R, -FILLET2_R * 0.02))
            Line((5 - FILLET2_R, -FILLET2_R * 0.02), (5 + FILLET2_R * 0.02, -FILLET2_R * 0.02))
            Line((5 + FILLET2_R * 0.02, -FILLET2_R * 0.02), (5 + FILLET2_R * 0.02, FILLET2_R))
            Line((5 + FILLET2_R * 0.02, FILLET2_R), (5, FILLET2_R))
        make_face()
    fillet2_piece_8 = revolve(axis=Axis((0.847651782, 3.530602507, -2), (0, 0, -1)), revolution_arc=76.983353639, mode=Mode.PRIVATE)
    fillet2_piece_8 = split(fillet2_piece_8, bisect_by=Plane(origin=(-1.33988421, 6, -2.285061446), z_dir=(0, 1, 0)), keep=Keep.TOP, mode=Mode.PRIVATE)
    add(fillet2_piece_8, mode=Mode.SUBTRACT)

    # Sketch17 → Cut-Extrude12 (cut, two sides: drawn at the far end of the back side and taken through both)
    with BuildSketch(Plane(origin=(6.5, 0, 0), x_dir=(0, 0, -1), z_dir=(1, 0, 0)).offset(-CUT_EXTRUDE12_DEPTH_BACK)):
        with Locations(Location((3.95, 0, 0), (0, 0, 90))):
            Circle(SKETCH17_R)
        with Locations(Location((12.95, 0, 0), (0, 0, 180))):
            Circle(SKETCH17_R)
    extrude(amount=CUT_EXTRUDE12_DEPTH + CUT_EXTRUDE12_DEPTH_BACK, mode=Mode.SUBTRACT)

    # Sketch18 → Boss-Extrude5 (add)
    with BuildSketch(Plane.ZY.offset(-4.8).offset(BOSS_EXTRUDE5_START)):
        with Locations((-12.95, 0)):
            Circle(SKETCH18_R)
        with Locations(Location((-3.95, 0, 0), (0, 0, 90))):
            Circle(SKETCH18_R_2)
    extrude(amount=BOSS_EXTRUDE5_DEPTH)

    # Sketch19 → Cut-Extrude13 (cut, symmetric)
    with BuildSketch(Plane(origin=(0, 0, 0), x_dir=(-1, 0, 0), z_dir=(0, -1, 0))):
        with Locations((-9.3, 6.25)):
            Rectangle(SKETCH19_W, SKETCH19_H)
    extrude(amount=CUT_EXTRUDE13_DEPTH, both=True, mode=Mode.SUBTRACT)

    # Chamfer8
    # the kernel refuses this chamfer: 0.75 mm, written as the material it takes off along each edge
    with BuildSketch(Plane(origin=(13.928762241, -6, -2.9), x_dir=(0, 0.02749587661058678, 0.9996219169112968), z_dir=(-1, 0, 0))) as chamfer8_piece_1_section:
        Polygon((CHAMFER8_SIZE * 0.999621916911, -CHAMFER8_SIZE * 0.0274958766106), (-CHAMFER8_SIZE * 0.0274958766106, -CHAMFER8_SIZE * 0.999621916911), (0, 0), align=None)
    chamfer8_piece_1 = extrude(amount=7.328762241, mode=Mode.PRIVATE)
    chamfer8_piece_1 = split(chamfer8_piece_1, bisect_by=Plane(origin=(10.26438112, -6.45, -2.618742905), z_dir=(0, 1, 0)), keep=Keep.TOP, mode=Mode.PRIVATE)
    add(chamfer8_piece_1, mode=Mode.SUBTRACT)
    with BuildSketch(Plane(origin=(6.6, 6, -2.9), x_dir=(0, -0.02749587661058678, 0.9996219169112968), z_dir=(1, 0, 0))) as chamfer8_piece_2_section:
        Polygon((CHAMFER8_SIZE * 0.999621916911, -CHAMFER8_SIZE * 0.0274958766106), (-CHAMFER8_SIZE * 0.0274958766106, -CHAMFER8_SIZE * 0.999621916911), (0, 0), align=None)
    chamfer8_piece_2 = extrude(amount=7.328762241, mode=Mode.PRIVATE)
    chamfer8_piece_2 = split(chamfer8_piece_2, bisect_by=Plane(origin=(10.26438112, 6.45, -2.618742905), z_dir=(0, -1, 0)), keep=Keep.TOP, mode=Mode.PRIVATE)
    add(chamfer8_piece_2, mode=Mode.SUBTRACT)

    # Chamfer9
    # the kernel refuses this chamfer: 0.5, 0.288675135 mm, written as the material it takes off along each edge
    with BuildSketch(Plane(origin=(6.6, -6, -9.6), x_dir=(0, 0.057893862402671276, -0.9983227437537925), z_dir=(1, 0, 0))) as chamfer9_piece_1_section:
        Polygon((CHAMFER9_SIZE * 0.998322742353, -CHAMFER9_SIZE * 0.0578938623214), (-CHAMFER9_SIZE_2 * 0.0578938624027, -CHAMFER9_SIZE_2 * 0.998322743754), (0, 0), align=None)
    chamfer9_piece_1 = extrude(amount=6.693542877, mode=Mode.PRIVATE)
    chamfer9_piece_1 = split(chamfer9_piece_1, bisect_by=Plane(origin=(9.946771439, -6.45, -9.694765745), z_dir=(0, 1, 0)), keep=Keep.TOP, mode=Mode.PRIVATE)
    add(chamfer9_piece_1, mode=Mode.SUBTRACT)
    with BuildSketch(Plane(origin=(13.293542877, 6, -9.6), x_dir=(0, 0.9998132206222079, 0.019326765612700258), z_dir=(-1, 0, 0))) as chamfer9_piece_2_section:
        Polygon((CHAMFER9_SIZE_2 * 0.999813220622, CHAMFER9_SIZE_2 * 0.0193267656127), (-CHAMFER9_SIZE * 0.0193267655856, CHAMFER9_SIZE * 0.999813219219), (0, 0), align=None)
    chamfer9_piece_2 = extrude(amount=6.693542877, mode=Mode.PRIVATE)
    chamfer9_piece_2 = split(chamfer9_piece_2, bisect_by=Plane(origin=(9.946771439, 6.45, -9.694765745), z_dir=(0, -1, 0)), keep=Keep.TOP, mode=Mode.PRIVATE)
    add(chamfer9_piece_2, mode=Mode.SUBTRACT)

    # Chamfer10
    chamfer10_edges = [part.edges().sort_by_distance(p)[0] for p in [
        (12, 6.45, -6.114433757),
        (12, -6.45, -6.114433757),
    ]]
    chamfer(chamfer10_edges, length=CHAMFER10_SIZE)


solid = part.part
